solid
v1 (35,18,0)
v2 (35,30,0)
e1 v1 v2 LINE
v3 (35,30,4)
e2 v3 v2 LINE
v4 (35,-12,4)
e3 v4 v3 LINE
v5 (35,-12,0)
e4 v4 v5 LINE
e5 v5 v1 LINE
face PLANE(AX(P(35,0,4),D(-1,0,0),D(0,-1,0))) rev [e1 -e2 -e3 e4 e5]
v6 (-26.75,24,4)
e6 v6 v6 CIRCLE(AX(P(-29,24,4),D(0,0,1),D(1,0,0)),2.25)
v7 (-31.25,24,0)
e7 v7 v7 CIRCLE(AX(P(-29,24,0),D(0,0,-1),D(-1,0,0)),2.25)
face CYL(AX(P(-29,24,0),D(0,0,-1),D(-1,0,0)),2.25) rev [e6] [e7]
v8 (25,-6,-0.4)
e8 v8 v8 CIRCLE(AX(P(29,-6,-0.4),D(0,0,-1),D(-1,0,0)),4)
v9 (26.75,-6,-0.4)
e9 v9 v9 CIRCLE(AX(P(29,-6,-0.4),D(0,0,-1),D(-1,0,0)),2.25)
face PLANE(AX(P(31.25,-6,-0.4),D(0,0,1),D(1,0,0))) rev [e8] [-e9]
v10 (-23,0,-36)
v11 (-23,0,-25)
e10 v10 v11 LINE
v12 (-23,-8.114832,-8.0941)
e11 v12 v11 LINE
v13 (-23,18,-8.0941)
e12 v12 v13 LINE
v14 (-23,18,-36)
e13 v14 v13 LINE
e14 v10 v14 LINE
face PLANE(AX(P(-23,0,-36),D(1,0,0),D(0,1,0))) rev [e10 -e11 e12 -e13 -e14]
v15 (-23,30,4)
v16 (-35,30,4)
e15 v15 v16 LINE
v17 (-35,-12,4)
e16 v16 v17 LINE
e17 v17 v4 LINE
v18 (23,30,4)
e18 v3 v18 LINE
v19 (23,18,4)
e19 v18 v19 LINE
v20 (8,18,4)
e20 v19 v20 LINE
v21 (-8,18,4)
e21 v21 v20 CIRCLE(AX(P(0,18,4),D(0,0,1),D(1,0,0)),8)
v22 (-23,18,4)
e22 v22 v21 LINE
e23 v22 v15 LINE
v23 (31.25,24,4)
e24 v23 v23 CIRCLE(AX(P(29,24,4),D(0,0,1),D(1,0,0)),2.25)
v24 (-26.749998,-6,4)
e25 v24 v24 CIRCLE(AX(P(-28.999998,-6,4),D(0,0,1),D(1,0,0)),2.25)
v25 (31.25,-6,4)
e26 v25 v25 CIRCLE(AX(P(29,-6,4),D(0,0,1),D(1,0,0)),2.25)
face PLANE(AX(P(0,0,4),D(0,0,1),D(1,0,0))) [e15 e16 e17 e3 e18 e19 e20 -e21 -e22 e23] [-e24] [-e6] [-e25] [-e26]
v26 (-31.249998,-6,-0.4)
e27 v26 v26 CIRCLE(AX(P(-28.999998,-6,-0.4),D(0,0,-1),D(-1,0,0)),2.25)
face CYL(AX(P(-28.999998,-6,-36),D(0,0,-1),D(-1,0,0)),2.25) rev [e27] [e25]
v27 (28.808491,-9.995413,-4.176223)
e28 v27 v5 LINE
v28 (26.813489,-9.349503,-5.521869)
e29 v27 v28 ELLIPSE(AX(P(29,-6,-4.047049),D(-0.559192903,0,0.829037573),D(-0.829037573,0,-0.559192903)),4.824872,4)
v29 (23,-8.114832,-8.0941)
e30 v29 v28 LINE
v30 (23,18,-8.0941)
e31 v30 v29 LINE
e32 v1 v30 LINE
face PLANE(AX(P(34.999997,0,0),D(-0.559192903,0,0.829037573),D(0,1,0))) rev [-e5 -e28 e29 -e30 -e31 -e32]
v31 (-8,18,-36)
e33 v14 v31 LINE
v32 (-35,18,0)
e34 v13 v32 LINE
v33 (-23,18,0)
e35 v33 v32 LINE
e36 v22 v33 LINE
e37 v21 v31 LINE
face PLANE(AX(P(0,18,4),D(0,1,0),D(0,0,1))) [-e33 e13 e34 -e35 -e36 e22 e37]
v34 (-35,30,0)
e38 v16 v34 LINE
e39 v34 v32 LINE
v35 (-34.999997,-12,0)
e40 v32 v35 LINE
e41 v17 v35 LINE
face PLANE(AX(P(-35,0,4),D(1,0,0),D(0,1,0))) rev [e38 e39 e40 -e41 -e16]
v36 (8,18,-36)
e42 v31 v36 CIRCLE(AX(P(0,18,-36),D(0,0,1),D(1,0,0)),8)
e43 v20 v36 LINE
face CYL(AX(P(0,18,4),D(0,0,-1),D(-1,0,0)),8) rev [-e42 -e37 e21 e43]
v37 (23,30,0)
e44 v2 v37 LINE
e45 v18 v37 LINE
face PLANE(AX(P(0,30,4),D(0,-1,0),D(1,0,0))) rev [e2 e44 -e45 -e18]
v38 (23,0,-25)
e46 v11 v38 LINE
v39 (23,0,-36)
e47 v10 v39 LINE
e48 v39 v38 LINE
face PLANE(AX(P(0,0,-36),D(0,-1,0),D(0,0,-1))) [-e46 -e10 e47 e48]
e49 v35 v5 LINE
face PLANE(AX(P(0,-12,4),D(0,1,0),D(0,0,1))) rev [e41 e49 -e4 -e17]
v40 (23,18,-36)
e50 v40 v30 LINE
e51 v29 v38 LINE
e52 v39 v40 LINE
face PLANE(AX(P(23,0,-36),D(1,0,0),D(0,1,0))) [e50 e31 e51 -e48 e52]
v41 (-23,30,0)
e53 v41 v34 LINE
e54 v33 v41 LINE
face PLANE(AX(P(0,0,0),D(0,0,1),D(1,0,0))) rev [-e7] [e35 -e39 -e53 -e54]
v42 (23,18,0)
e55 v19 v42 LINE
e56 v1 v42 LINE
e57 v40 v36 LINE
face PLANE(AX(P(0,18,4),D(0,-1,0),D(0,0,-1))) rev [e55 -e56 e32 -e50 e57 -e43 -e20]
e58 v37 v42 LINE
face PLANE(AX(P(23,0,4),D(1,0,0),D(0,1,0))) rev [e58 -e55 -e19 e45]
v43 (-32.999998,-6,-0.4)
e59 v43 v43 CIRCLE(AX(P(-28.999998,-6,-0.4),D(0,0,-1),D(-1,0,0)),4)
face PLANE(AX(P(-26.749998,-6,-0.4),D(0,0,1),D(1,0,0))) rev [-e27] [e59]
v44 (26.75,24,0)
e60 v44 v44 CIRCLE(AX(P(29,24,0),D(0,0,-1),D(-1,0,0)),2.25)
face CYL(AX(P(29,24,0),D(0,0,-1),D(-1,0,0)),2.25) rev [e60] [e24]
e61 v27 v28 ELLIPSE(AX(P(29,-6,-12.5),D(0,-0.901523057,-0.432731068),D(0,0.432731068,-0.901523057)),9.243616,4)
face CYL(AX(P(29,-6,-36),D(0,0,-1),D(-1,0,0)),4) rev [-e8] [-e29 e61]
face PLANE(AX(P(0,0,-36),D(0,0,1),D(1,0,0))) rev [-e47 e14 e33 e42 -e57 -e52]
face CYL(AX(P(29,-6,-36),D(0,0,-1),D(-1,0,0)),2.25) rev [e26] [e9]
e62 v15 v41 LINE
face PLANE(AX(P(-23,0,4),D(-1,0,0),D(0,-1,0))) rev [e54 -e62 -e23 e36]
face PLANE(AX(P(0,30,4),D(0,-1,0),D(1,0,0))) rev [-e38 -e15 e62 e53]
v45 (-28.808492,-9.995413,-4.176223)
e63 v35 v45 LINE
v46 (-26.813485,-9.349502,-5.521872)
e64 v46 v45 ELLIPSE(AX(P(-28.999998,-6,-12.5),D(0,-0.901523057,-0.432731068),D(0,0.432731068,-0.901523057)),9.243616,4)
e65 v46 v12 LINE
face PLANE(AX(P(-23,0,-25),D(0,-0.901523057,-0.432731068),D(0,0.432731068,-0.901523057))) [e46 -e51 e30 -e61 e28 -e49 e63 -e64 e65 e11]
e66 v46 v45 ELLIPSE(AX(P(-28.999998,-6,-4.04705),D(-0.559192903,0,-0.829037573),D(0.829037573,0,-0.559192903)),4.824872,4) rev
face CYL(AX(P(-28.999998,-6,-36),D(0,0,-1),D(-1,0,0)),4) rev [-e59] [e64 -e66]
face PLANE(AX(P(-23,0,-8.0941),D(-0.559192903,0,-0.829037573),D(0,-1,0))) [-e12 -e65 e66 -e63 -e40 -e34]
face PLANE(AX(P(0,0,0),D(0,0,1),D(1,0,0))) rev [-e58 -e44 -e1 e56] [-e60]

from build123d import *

# Parameters (mm, degrees)
ESTRUSIONE_ESTRUSIONE1_DEPTH                         = 4
ESTRUSIONE_ESTRUSIONE2_START                         = -36
ESTRUSIONE_ESTRUSIONE2_DEPTH                         = 36
ESTRUSIONE_ESTRUSIONE3_START                         = -46
ESTRUSIONE_ESTRUSIONE3_DEPTH                         = 46
SMUSSO3_SIZE                                         = 8.0941
SMUSSO3_SIZE2                                        = 11.999996735
SMUSSO2_SIZE                                         = 8.0941
SMUSSO2_SIZE_2                                       = 11.999996735
FORO_LAMATO_PER_VITE_M4_A_TESTA_CILINDRI_D           = 4.5
FORO_LAMATO_PER_VITE_M4_A_TESTA_CILINDRI_DEPTH       = 50
FORO_LAMATO_PER_VITE_M4_A_TESTA_CILINDRI_CBORE_D     = 8
FORO_LAMATO_PER_VITE_M4_A_TESTA_CILINDRI_CBORE_DEPTH = 35.6
FORO_LAMATO_PER_VITE_M4_A_TESTA_CILINDRI_TIP         = 1.351936393
FORO_PER_VITE_M4_1_D                                 = 4.5
FORO_PER_VITE_M4_1_DEPTH                             = 50
FORO_PER_VITE_M4_1_TIP                               = 1.351936393


with BuildPart() as part:
    # Schizzo1 → Estrusione-Estrusione1 (new body)
    with BuildSketch(Plane.XY):
        Polygon((35, 30), (23, 30), (23, 18), (23, 0), (-23, 0), (-23, 18), (-23, 30), (-35, 30), (-35, -12), (35, -12), align=None)
        with BuildLine():
            ThreePointArc((-8, 18), (0, 10), (8, 18))
            Line((8, 18), (23, 18))
            Line((23, 18), (23, 0))
            Line((23, 0), (-23, 0))
            Line((-23, 0), (-23, 18))
            Line((-23, 18), (-8, 18))
        make_face()
    extrude(amount=ESTRUSIONE_ESTRUSIONE1_DEPTH)

    # Schizzo1<3> → Estrusione-Estrusione2 (add)
    with BuildSketch(Plane.XY.offset(ESTRUSIONE_ESTRUSIONE2_START)):
        with BuildLine():
            ThreePointArc((-8, 18), (0, 10), (8, 18))
            Line((8, 18), (23, 18))
            Line((23, 18), (23, 0))
            Line((23, 0), (-23, 0))
            Line((-23, 0), (-23, 18))
            Line((-23, 18), (-8, 18))
        make_face()
    extrude(amount=ESTRUSIONE_ESTRUSIONE2_DEPTH)

    # Schizzo6 → Estrusione-Estrusione3 (add)
    with BuildSketch(Plane(origin=(23, 0, 0), x_dir=(0, 0, -1), z_dir=(1, 0, 0)).offset(ESTRUSIONE_ESTRUSIONE3_START)):
        Polygon((0, 0), (25, 0), (0, -12), align=None)
    extrude(amount=ESTRUSIONE_ESTRUSIONE3_DEPTH)

    # Smusso3
    smusso3_edges = [part.edges().sort_by_distance(p)[0] for p in [
        (-23, 3, 0),
    ]]
    smusso3_side = [part.faces().sort_by_distance(p)[0] for p in [
        (-23, 6.556390977, -16.182957393),
    ]]
    chamfer(smusso3_edges, length=SMUSSO3_SIZE, length2=SMUSSO3_SIZE2, reference=smusso3_side[0])

    # Smusso2
    # the kernel refuses this chamfer: 11.999996735, 8.0941 mm, written as the material it adds along each edge
    with BuildSketch(Plane(origin=(23, -43.002099643, 0), x_dir=(-0.047532142988028575, 0, -0.9988697089125115), z_dir=(0, 1, 0))) as smusso2_piece_1_section:
        Polygon((SMUSSO2_SIZE * 0.998869708913, -SMUSSO2_SIZE * 0.047532142988), (-SMUSSO2_SIZE_2 * 0.047532142989, -SMUSSO2_SIZE_2 * 0.998869708932), (0, 0), align=None)
    smusso2_piece_1 = extrude(amount=61.002099643, mode=Mode.PRIVATE)
    smusso2_piece_1 = split(smusso2_piece_1, bisect_by=Plane(origin=(27.04511503, -8.043833676, -8.242013176), z_dir=(0, 0.9015230574682735, 0.4327310675847713)), keep=Keep.TOP, mode=Mode.PRIVATE)
    add(smusso2_piece_1)

    # Foro lamato per Vite M4 a testa cilindrica piana-1
    with Locations(Plane(origin=(0, 0, -36), x_dir=(-1, 0, 0), z_dir=(0, 0, -1))):
        with Locations((-29, -6), (28.999998368, -6)):
            CounterBoreHole(FORO_LAMATO_PER_VITE_M4_A_TESTA_CILINDRI_D / 2, FORO_LAMATO_PER_VITE_M4_A_TESTA_CILINDRI_CBORE_D / 2, FORO_LAMATO_PER_VITE_M4_A_TESTA_CILINDRI_CBORE_DEPTH, depth=FORO_LAMATO_PER_VITE_M4_A_TESTA_CILINDRI_DEPTH)
            with Locations((0, 0, -(FORO_LAMATO_PER_VITE_M4_A_TESTA_CILINDRI_DEPTH + FORO_LAMATO_PER_VITE_M4_A_TESTA_CILINDRI_TIP / 2))):  # 118° drill point
                Cone(0, FORO_LAMATO_PER_VITE_M4_A_TESTA_CILINDRI_D / 2, FORO_LAMATO_PER_VITE_M4_A_TESTA_CILINDRI_TIP, mode=Mode.SUBTRACT)

    # Foro per Vite M4-1
    with Locations(Plane(origin=(29, 24, 0), x_dir=(-1, 0, 0), z_dir=(0, 0, -1))):
        with Locations((0, 0), (58, 0)):
            Hole(FORO_PER_VITE_M4_1_D / 2, depth=FORO_PER_VITE_M4_1_DEPTH)
            with Locations((0, 0, -(FORO_PER_VITE_M4_1_DEPTH + FORO_PER_VITE_M4_1_TIP / 2))):  # 118° drill point
                Cone(0, FORO_PER_VITE_M4_1_D / 2, FORO_PER_VITE_M4_1_TIP, mode=Mode.SUBTRACT)


solid = part.part
